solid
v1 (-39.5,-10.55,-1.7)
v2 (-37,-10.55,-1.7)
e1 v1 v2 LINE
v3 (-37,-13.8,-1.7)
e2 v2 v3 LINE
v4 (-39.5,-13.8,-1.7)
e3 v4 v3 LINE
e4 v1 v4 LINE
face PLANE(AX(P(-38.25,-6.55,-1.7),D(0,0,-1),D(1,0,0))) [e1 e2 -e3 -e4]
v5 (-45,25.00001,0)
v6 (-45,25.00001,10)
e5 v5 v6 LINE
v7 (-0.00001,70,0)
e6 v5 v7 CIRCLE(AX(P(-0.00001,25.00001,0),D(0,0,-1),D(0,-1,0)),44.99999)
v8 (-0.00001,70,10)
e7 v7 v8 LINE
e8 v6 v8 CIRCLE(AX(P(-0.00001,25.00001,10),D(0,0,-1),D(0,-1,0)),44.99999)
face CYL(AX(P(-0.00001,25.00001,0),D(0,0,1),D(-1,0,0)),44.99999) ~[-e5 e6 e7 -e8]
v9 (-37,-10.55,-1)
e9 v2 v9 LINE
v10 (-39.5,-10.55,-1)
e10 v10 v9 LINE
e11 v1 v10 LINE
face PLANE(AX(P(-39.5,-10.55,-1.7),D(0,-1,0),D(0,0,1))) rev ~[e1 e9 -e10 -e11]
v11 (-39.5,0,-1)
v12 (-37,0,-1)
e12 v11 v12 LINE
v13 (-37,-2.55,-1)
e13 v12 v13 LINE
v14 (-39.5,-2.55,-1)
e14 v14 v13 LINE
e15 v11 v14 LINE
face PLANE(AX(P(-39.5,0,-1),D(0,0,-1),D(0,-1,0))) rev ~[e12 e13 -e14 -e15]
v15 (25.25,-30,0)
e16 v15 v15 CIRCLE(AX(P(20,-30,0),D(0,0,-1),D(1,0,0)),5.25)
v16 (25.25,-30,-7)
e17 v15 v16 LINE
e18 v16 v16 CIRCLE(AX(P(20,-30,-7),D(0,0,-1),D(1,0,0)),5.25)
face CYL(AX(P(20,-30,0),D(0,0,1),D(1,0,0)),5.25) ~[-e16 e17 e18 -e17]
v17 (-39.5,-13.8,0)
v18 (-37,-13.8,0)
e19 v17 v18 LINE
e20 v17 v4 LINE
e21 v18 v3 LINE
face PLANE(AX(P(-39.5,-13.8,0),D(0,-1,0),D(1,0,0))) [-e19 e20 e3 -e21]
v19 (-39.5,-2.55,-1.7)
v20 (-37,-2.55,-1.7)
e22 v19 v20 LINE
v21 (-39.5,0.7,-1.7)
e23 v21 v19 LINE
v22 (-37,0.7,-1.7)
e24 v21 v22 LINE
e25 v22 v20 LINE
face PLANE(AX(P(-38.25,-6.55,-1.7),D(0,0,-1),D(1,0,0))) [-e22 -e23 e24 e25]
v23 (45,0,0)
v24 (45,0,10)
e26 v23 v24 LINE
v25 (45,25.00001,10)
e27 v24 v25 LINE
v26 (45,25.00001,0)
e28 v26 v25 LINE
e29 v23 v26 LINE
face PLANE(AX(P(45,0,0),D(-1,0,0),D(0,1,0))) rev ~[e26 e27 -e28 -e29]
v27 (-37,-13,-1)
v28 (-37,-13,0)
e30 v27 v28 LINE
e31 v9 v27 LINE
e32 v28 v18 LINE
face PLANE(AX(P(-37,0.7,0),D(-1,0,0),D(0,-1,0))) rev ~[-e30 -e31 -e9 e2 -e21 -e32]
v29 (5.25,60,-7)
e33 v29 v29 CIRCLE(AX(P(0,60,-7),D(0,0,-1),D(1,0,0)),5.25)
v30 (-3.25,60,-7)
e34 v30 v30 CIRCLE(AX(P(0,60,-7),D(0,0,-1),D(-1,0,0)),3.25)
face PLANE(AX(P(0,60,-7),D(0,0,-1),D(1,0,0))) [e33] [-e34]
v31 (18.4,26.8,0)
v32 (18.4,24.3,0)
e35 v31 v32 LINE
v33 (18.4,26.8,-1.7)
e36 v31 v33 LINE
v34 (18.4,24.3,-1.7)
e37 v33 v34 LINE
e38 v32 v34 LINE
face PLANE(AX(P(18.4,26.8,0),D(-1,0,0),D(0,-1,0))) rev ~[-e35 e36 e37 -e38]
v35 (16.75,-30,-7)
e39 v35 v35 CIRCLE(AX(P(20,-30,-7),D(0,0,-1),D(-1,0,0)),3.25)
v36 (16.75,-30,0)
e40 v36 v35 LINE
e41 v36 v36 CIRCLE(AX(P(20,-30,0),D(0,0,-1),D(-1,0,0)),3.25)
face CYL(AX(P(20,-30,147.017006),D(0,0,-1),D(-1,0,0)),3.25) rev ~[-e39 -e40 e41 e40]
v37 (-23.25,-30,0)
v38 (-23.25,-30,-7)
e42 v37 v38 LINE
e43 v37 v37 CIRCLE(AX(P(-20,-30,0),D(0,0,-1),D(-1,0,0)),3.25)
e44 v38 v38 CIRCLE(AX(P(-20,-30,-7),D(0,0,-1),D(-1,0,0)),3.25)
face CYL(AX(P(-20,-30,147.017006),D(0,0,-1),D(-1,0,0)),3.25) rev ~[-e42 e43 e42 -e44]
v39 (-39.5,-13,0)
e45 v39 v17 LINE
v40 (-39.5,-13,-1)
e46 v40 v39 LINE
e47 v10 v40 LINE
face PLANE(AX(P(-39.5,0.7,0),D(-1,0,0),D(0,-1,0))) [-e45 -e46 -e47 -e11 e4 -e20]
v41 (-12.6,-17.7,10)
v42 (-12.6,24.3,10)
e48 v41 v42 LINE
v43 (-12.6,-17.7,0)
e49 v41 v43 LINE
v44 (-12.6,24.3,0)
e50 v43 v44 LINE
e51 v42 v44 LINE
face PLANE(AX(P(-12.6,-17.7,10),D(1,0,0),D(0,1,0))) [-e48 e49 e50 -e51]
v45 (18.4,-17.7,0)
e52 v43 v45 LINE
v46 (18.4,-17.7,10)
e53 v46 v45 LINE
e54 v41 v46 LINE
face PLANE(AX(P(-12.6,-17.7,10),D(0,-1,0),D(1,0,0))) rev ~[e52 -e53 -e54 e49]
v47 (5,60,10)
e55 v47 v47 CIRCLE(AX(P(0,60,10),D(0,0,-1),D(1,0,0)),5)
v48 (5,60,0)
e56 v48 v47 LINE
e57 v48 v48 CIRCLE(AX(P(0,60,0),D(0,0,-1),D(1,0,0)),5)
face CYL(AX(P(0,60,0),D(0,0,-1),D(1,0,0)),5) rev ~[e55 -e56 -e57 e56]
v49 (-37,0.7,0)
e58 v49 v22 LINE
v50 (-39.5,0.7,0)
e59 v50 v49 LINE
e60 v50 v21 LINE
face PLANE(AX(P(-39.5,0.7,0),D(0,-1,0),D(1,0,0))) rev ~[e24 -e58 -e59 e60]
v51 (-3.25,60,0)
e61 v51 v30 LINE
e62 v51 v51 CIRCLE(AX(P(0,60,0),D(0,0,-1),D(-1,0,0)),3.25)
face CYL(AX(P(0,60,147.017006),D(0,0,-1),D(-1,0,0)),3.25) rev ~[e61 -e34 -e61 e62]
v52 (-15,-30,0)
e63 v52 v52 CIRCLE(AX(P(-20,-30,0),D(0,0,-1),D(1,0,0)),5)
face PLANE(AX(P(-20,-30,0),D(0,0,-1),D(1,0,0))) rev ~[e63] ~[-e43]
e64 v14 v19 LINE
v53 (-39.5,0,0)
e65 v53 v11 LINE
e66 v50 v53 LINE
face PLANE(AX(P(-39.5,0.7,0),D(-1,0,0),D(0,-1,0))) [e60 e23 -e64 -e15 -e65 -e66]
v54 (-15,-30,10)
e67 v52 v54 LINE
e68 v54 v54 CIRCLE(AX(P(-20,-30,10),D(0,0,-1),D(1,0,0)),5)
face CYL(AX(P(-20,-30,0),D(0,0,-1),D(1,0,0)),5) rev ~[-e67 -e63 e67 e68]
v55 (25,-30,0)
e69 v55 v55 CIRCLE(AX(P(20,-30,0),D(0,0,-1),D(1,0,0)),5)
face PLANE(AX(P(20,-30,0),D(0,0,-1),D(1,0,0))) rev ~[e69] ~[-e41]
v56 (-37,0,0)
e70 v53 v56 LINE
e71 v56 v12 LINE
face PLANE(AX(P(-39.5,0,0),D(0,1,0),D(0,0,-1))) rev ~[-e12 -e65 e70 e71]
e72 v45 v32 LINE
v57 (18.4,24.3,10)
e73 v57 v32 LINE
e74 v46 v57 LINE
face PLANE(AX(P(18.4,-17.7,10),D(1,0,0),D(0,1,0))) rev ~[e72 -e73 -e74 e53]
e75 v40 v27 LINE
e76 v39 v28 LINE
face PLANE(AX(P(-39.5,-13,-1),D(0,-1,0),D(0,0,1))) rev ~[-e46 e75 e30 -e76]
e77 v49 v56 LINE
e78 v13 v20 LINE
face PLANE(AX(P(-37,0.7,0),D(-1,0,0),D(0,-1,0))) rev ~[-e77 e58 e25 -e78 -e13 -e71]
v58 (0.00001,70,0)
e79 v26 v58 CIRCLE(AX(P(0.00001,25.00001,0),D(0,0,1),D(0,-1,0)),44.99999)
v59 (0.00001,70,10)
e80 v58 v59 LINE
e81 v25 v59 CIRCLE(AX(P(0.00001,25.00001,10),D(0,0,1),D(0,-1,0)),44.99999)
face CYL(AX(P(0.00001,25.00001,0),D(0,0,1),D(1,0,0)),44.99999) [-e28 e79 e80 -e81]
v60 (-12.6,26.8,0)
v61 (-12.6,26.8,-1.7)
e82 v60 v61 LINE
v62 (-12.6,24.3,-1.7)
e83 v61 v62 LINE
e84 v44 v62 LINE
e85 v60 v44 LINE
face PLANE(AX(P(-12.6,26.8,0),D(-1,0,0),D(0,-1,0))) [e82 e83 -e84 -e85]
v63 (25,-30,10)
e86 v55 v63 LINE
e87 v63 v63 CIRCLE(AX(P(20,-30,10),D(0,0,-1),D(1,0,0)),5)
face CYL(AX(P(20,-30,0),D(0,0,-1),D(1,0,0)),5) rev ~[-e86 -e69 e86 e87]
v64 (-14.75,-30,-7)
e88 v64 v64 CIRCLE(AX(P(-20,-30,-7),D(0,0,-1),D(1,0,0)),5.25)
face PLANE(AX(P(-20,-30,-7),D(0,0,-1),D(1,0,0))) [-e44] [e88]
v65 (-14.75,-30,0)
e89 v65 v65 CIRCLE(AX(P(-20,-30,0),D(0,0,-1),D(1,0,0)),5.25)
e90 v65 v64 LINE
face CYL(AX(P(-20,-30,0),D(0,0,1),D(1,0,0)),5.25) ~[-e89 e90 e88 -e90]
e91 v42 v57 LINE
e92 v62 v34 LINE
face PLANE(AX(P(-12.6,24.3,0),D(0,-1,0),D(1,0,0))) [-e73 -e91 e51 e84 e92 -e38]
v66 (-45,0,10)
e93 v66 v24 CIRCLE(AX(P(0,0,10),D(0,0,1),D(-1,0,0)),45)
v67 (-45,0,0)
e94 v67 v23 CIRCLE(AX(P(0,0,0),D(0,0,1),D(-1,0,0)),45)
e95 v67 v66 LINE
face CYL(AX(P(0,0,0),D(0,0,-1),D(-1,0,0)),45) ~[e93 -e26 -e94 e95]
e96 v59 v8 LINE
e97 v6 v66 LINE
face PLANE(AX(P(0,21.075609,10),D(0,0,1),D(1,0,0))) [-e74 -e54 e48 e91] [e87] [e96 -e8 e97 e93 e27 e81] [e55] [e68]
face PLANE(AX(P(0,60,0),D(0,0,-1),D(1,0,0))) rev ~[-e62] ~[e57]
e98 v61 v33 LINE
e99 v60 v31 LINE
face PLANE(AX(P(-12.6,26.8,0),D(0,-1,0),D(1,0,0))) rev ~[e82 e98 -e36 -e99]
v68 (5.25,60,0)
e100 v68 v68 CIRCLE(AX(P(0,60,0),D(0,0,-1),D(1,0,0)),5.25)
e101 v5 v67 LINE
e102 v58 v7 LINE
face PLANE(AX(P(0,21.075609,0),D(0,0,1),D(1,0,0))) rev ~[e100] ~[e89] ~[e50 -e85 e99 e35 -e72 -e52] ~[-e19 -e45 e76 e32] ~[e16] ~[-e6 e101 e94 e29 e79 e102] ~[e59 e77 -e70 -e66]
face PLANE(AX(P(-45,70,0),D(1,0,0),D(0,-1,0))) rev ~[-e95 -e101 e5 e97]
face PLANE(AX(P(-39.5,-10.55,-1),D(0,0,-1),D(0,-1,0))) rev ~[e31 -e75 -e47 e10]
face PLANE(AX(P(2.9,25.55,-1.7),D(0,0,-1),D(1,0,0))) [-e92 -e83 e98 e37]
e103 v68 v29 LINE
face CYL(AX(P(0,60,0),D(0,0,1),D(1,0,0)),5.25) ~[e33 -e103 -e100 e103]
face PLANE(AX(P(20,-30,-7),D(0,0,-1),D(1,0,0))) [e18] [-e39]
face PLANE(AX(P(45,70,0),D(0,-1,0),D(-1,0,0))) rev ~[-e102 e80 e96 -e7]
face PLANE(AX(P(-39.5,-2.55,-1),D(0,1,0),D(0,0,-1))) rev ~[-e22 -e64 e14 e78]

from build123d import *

# Parameters (mm, degrees)
F1_DEPTH    = 10
F3_R        = 44.99999
F4_W        = 31
F4_H        = 42
F5_DEPTH    = 11
F6_R        = 5.25
F7_DEPTH    = 7
F9_D        = 10
F9_DEPTH    = 10.001
F10_D       = 6.5
F10_ON_F6_D = 6.5
F11_W       = 31
F11_H       = 2.5
F12_DEPTH   = 1.7
F13_W       = 2.5
F13_H       = 14.5
F14_DEPTH   = 1.7
F16_DEPTH   = 25


# Not quite as in the source:
# - a fillet or chamfer is up to 0.001 mm smaller than in the source, because OpenCascade refuses the exact size


with BuildPart() as f1:
    # F0 (on Top) → F1 (new body)
    with BuildSketch(Plane.XY):
        with BuildLine():
            Line((-45, 70), (-45, 0))
            ThreePointArc((-45, 0), (0, -45), (45, 0))
            Line((45, 0), (45, 70))
            Line((45, 70), (-45, 70))
        make_face()
    extrude(amount=F1_DEPTH)

    # F3 (radius 45 in the source; OpenCascade refuses exactly that, so slightly less here)
    f3_edges = [f1.edges().sort_by_distance(p)[0] for p in [
        (-45, 70, 5),
        (45, 70, 5),
    ]]
    fillet(f3_edges, radius=F3_R)

    # F4 (on face) → F5 (cut)
    with BuildSketch(Plane.XY.offset(10)):
        with Locations((2.9, 3.3)):
            Rectangle(F4_W, F4_H)
    extrude(amount=-F5_DEPTH, mode=Mode.SUBTRACT)

    # F6 (on face) → F7 (join)
    with BuildSketch(Plane(origin=(0, 0, 0), x_dir=(1, 0, 0), z_dir=(0, 0, -1))):
        with Locations((0, -60)):
            Circle(F6_R)
        with Locations((-20, 30)):
            Circle(F6_R)
        with Locations((20, 30)):
            Circle(F6_R)
    extrude(amount=F7_DEPTH)

    # F9 (through all, one way)
    with BuildSketch(Plane(origin=(0, 0, 0), x_dir=(1, 0, 0), z_dir=(0, 0, -1))):
        with Locations((-20, 30), (20, 30), (0, -60)):
            Circle(F9_D / 2)
    extrude(amount=-F9_DEPTH, mode=Mode.SUBTRACT)

    # F10 (through all)
    with Locations(Plane.XY):
        with Locations((20, -30), (0, 60)):
            Hole(F10_D / 2)

    # F10 on F6 (through all)
    with Locations(Plane.XY):
        with Locations((-20, -30)):
            Hole(F10_ON_F6_D / 2)

    # F11 (on face) → F12 (join)
    with BuildSketch(Plane(origin=(0, 0, 0), x_dir=(1, 0, 0), z_dir=(0, 0, -1))):
        with Locations((2.9, -25.55)):
            Rectangle(F11_W, F11_H)
    extrude(amount=F12_DEPTH)

    # F13 (on face) → F14 (join)
    with BuildSketch(Plane(origin=(0, 0, 0), x_dir=(1, 0, 0), z_dir=(0, 0, -1))):
        with Locations((-38.25, 6.55)):
            Rectangle(F13_W, F13_H)
    extrude(amount=F14_DEPTH)

    # F15 (on face) → F16 (cut)
    with BuildSketch(Plane(origin=(-39.5, 0, 0), x_dir=(0, -1, 0), z_dir=(-1, 0, 0))):
        Polygon((13, -1), (13, 0), (0, 0), (0, -1), (2.55, -1), (2.55, -1.7), (10.55, -1.7), (10.55, -1), align=None)
    extrude(amount=-F16_DEPTH, mode=Mode.SUBTRACT)


solid = f1.part
